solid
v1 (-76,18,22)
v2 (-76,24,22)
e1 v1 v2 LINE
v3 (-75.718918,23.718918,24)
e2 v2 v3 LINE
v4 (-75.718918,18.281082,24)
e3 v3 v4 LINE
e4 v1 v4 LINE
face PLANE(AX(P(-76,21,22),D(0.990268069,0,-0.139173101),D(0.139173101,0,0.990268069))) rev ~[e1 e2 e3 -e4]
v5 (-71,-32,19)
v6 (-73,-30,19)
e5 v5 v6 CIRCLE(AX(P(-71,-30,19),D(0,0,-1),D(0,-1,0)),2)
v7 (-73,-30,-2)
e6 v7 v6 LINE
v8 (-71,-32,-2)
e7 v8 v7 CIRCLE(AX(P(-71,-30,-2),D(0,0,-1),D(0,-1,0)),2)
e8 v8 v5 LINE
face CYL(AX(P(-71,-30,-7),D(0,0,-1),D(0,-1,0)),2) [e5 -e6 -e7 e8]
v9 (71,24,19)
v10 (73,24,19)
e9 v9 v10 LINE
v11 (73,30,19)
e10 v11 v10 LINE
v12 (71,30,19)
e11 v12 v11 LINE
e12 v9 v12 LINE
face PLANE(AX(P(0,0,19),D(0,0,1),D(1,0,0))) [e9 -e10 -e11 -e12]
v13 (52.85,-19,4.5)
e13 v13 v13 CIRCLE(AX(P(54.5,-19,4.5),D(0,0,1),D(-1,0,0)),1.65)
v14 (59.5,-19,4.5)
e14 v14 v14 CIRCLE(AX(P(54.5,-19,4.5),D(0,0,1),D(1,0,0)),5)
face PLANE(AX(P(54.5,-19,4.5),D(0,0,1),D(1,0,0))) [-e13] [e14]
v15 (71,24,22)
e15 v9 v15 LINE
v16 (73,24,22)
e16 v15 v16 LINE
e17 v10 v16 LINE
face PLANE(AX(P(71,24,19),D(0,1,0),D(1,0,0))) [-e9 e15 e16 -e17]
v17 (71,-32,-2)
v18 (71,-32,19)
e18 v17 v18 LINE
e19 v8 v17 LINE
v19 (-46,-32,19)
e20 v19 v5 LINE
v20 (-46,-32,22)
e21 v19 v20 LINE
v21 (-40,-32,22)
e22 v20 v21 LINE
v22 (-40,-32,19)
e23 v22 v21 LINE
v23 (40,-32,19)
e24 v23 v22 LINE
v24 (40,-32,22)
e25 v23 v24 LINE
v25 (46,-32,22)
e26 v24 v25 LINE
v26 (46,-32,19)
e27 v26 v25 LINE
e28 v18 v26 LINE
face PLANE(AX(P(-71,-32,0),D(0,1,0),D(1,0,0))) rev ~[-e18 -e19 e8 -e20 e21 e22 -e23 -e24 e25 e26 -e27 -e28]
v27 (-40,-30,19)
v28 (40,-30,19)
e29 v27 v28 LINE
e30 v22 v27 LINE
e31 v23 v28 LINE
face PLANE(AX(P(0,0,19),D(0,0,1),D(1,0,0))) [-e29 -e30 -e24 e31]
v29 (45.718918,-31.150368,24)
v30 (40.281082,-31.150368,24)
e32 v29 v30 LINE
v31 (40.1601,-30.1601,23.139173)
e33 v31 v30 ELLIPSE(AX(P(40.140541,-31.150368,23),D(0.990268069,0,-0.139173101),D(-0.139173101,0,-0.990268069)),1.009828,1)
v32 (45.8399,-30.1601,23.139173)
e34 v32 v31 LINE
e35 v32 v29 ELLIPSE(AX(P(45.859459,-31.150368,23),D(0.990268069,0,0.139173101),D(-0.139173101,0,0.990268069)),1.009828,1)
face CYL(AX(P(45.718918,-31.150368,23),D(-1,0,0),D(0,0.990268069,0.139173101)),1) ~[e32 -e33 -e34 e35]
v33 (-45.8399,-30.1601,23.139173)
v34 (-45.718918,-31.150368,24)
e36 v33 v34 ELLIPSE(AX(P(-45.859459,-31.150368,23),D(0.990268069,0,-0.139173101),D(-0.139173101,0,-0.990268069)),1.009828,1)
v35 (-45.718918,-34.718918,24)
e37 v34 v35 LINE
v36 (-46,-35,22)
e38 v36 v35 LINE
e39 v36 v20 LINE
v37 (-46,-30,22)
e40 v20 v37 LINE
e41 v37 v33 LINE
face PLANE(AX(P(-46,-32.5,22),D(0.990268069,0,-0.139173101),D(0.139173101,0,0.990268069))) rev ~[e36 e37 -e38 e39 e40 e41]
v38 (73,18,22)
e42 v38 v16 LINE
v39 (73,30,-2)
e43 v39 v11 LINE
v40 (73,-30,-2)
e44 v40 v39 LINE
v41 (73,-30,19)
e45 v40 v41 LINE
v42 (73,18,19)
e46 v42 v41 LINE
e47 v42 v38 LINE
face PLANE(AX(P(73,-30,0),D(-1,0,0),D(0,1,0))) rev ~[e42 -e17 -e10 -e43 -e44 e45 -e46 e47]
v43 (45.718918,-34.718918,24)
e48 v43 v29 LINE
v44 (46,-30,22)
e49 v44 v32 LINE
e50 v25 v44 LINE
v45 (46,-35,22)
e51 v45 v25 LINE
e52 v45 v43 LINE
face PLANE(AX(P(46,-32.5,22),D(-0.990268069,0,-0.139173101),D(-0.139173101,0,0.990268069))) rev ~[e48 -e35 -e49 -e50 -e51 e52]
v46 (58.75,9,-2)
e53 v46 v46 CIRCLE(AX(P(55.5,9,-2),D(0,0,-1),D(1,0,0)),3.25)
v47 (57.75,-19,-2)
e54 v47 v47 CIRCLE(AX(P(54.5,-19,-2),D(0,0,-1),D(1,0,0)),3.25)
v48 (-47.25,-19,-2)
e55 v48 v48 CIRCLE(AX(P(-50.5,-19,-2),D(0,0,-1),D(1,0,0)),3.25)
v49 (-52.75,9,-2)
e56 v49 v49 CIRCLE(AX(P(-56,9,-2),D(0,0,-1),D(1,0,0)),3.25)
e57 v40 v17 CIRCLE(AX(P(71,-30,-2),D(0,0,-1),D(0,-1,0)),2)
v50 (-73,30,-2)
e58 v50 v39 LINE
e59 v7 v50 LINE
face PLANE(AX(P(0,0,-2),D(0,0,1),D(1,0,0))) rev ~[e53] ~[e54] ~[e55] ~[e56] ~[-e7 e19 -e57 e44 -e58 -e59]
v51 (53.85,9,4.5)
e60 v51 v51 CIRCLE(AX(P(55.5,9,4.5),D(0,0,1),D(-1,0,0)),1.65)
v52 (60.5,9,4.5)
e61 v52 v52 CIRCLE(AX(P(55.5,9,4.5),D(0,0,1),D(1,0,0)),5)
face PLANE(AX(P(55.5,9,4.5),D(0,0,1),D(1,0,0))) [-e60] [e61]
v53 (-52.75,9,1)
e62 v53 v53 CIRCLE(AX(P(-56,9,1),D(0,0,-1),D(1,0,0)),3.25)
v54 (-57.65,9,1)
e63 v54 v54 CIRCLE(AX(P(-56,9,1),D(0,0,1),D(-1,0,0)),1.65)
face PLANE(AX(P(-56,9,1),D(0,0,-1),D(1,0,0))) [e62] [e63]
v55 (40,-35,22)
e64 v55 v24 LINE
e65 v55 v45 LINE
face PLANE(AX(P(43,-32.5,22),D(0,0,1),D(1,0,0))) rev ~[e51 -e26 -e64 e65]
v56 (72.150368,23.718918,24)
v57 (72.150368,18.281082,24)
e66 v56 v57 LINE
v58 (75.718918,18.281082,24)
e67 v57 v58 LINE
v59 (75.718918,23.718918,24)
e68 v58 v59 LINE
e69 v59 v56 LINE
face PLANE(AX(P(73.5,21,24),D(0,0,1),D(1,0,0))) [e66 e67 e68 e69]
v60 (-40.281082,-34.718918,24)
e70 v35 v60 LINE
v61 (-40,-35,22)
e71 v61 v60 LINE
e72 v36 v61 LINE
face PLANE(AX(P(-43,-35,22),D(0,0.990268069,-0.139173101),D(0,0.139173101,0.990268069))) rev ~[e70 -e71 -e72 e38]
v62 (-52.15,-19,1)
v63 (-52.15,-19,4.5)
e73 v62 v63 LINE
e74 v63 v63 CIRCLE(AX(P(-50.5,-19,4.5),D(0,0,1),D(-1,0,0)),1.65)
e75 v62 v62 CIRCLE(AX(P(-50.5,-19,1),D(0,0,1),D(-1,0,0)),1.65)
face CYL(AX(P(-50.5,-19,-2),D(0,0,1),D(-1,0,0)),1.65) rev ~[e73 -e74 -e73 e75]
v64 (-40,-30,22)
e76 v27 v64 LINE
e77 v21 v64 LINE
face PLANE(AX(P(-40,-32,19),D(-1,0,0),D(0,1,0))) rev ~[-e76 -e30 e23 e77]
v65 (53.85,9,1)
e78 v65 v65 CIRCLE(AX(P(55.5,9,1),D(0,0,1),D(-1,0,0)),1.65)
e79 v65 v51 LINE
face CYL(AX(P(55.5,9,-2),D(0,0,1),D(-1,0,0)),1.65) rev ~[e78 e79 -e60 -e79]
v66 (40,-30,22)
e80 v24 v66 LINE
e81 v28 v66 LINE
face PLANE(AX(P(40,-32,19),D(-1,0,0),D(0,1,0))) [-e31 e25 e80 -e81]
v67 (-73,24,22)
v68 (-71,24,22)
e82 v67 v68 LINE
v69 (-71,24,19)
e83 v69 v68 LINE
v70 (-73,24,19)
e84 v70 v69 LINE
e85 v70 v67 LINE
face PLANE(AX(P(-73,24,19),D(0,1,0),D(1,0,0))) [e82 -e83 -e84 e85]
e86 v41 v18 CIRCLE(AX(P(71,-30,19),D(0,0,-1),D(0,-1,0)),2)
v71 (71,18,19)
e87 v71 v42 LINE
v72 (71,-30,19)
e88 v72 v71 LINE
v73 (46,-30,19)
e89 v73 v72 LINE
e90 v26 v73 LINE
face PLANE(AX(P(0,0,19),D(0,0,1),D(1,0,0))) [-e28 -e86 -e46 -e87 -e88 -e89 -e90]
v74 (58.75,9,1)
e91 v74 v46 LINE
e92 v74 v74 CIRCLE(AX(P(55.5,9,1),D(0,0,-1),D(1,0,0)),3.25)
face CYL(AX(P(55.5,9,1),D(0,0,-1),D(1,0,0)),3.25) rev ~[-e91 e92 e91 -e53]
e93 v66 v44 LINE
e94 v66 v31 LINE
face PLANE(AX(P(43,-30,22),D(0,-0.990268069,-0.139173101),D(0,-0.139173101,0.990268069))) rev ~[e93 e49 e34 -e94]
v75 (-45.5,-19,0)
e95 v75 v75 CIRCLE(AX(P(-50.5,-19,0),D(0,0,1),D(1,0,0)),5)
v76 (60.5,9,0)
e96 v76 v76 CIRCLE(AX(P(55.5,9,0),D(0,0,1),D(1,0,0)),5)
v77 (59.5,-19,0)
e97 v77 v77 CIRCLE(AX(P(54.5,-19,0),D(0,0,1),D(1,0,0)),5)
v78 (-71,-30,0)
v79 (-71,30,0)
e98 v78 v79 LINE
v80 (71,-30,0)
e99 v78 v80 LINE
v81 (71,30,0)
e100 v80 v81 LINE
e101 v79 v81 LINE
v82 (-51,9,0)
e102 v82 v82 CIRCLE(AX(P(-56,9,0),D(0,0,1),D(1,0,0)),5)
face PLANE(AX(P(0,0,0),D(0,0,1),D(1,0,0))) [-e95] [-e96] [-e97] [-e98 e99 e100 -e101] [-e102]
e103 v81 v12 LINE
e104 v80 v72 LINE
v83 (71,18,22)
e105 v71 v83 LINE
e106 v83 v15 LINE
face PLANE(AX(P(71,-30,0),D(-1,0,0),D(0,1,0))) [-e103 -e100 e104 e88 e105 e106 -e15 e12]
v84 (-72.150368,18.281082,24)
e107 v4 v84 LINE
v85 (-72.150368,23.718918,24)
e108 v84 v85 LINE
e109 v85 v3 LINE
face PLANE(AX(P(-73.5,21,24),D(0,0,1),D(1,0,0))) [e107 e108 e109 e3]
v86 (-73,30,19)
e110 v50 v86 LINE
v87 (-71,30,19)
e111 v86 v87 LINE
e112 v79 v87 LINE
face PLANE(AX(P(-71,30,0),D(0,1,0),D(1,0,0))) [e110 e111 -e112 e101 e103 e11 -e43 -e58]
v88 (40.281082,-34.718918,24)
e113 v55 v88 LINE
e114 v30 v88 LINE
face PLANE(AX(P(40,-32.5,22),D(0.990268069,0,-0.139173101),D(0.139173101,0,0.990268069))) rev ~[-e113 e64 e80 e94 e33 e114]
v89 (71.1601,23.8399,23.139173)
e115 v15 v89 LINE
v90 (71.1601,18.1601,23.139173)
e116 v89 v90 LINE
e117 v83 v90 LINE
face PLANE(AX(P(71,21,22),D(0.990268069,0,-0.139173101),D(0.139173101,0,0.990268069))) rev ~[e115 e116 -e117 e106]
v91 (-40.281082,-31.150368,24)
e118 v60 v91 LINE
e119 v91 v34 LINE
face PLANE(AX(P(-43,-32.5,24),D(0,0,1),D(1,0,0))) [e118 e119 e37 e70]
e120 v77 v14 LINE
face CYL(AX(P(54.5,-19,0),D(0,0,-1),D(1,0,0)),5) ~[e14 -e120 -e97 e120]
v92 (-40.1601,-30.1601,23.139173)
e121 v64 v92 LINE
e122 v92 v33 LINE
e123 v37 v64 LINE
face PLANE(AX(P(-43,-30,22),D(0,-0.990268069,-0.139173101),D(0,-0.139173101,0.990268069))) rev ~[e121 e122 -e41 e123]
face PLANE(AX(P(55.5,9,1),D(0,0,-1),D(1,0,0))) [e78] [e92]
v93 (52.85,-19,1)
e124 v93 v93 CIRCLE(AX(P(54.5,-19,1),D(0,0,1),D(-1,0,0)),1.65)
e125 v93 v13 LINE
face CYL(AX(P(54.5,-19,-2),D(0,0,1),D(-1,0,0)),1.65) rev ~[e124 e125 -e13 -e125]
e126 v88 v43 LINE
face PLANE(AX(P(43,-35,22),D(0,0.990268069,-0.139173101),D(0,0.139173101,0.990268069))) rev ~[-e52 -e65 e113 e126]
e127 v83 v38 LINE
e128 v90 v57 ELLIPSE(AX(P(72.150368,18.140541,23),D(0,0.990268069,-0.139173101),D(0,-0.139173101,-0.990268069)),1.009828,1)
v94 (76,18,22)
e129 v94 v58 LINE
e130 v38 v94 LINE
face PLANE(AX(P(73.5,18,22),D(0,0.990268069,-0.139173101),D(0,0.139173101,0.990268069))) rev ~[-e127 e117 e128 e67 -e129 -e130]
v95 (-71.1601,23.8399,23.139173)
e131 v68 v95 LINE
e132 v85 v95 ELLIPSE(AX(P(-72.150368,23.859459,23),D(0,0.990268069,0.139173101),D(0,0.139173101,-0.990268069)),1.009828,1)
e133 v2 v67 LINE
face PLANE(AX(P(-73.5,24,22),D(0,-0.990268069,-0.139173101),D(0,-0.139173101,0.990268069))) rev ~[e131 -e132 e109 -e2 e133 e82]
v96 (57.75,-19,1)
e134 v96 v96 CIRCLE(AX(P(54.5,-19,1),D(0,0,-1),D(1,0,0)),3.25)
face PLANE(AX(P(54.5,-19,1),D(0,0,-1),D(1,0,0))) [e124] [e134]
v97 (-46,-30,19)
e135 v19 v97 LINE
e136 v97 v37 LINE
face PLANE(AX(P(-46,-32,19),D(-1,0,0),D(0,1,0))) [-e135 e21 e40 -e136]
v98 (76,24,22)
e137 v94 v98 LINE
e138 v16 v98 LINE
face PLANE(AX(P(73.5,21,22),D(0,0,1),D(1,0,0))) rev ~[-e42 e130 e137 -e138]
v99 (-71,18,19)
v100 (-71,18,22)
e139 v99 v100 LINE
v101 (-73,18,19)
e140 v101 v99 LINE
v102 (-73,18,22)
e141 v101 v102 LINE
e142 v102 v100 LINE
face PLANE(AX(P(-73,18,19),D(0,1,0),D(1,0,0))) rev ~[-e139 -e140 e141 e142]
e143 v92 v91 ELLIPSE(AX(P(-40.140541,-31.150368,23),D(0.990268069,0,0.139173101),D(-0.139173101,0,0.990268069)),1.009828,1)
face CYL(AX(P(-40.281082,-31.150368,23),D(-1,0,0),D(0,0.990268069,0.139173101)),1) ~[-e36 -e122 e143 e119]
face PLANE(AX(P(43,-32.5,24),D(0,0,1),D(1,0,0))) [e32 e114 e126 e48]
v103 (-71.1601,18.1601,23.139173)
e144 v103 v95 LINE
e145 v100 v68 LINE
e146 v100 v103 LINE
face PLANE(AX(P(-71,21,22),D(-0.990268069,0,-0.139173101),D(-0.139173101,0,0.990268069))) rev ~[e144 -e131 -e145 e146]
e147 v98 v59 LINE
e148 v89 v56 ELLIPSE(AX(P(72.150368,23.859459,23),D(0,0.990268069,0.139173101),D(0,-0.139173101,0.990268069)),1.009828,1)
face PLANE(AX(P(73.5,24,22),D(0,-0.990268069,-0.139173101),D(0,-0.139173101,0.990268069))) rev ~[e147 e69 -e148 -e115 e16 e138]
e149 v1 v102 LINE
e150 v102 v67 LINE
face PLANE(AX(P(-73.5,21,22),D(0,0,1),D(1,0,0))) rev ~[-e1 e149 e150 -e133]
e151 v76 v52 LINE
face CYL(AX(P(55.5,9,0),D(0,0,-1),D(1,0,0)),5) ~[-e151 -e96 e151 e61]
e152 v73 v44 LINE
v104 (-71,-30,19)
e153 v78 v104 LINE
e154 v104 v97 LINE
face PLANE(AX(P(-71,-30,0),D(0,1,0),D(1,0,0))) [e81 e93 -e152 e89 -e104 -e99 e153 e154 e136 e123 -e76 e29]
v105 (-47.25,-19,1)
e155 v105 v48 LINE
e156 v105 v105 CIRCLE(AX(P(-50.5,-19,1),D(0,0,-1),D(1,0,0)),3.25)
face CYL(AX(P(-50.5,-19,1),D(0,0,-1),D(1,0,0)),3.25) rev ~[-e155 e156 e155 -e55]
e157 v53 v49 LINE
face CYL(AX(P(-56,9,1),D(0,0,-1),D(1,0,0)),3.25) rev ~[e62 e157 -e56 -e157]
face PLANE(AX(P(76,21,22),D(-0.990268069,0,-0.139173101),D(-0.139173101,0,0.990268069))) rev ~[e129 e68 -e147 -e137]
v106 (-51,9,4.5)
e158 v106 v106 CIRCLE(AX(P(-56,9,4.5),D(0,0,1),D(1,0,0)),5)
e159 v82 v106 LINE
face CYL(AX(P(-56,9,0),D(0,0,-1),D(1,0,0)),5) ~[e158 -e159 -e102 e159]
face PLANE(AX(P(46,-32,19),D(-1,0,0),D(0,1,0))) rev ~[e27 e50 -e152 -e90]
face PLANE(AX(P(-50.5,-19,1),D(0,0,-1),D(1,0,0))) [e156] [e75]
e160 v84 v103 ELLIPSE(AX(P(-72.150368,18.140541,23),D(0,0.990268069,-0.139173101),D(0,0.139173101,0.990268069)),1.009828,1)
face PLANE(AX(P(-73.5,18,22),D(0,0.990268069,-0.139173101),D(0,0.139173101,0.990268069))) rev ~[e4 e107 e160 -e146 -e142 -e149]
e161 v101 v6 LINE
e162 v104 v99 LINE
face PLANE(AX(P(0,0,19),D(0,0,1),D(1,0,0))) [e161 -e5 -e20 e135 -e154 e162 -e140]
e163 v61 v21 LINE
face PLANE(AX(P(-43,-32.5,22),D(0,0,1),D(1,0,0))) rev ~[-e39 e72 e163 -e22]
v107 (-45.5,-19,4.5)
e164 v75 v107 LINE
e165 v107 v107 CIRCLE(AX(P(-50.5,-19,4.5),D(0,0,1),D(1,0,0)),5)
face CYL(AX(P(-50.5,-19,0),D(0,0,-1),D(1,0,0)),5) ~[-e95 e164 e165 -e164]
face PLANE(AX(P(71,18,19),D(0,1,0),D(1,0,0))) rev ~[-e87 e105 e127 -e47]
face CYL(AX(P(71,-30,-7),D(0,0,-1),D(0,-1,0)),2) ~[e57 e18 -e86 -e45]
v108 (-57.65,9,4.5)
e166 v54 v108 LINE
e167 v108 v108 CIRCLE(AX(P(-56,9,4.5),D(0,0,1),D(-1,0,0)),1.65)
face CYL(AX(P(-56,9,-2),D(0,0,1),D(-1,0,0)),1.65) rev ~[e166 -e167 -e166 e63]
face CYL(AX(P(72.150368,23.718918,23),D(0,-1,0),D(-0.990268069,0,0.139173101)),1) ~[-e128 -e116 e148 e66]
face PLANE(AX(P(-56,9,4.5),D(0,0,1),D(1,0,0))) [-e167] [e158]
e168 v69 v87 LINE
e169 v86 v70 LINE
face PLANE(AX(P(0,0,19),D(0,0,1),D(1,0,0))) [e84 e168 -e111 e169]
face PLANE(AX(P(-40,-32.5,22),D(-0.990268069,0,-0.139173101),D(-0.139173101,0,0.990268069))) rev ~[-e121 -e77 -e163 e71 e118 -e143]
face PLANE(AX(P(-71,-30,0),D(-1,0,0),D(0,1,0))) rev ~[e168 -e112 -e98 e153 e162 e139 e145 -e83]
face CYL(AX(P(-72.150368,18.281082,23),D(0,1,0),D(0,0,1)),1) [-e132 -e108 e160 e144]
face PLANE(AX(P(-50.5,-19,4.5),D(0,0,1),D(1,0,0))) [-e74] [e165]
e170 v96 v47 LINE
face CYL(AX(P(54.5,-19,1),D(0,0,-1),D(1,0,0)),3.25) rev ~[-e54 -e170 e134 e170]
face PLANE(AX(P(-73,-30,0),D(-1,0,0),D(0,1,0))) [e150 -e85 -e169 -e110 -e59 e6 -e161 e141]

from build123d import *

# Parameters (mm, degrees)
F0_W            = 142
F0_H            = 60
F0_R            = 5
F1_DEPTH        = 19
F2_T            = 2
F3_T1_DEPTH     = 31
F4_W            = 6
F4_H            = 2
F4_W_2          = 2
F4_H_2          = 6
F5_DEPTH        = 3
F6_W            = 5
F6_H            = 6
F6_W_2          = 6
F6_H_2          = 5
F7_DEPTH        = 2
F7_TAPER        = 8
F8_R            = 1
F9_DEPTH        = 4.5
F11_D           = 3.3
F11_CBORE_D     = 6.5
F11_CBORE_DEPTH = 3


# Not quite as in the source:
# - a fillet or chamfer that OpenCascade refuses, or shapes differently, is made with other operations: its cross-section is extruded or revolved along the edge and cut away or added
# - a feature names something its author has since deleted; it is built from what else it names


with BuildPart() as f1:
    # F0 (on Top) → F1 (new body)
    with BuildSketch(Plane.XY):
        Rectangle(F0_W, F0_H)
        with Locations((-50.5, -19)):
            Circle(F0_R, mode=Mode.SUBTRACT)
        with Locations((54.5, -19)):
            Circle(F0_R, mode=Mode.SUBTRACT)
        with Locations((-56, 9)):
            Circle(F0_R, mode=Mode.SUBTRACT)
        with Locations((55.5, 9)):
            Circle(F0_R, mode=Mode.SUBTRACT)
        with Locations((-56, 9)):
            Circle(F0_R)
        with Locations((-50.5, -19)):
            Circle(F0_R)
        with Locations((54.5, -19)):
            Circle(F0_R)
        with Locations((55.5, 9)):
            Circle(F0_R)
    extrude(amount=F1_DEPTH)

    # F2
    f2_openings = [f1.faces().sort_by_distance(p)[0] for p in [
        (0, 0, 19),
        (0, 30, 9.5),
    ]]
    offset(amount=F2_T, openings=f2_openings, kind=Kind.INTERSECTION)

    # F3: fillet of radius 2 on 2 edges, made by hand

    # F3_s2 → F3_t1 (cut)
    with BuildSketch(Plane.XY.offset(-7)):
        with BuildLine():
            ThreePointArc((-71, -32), (-72.4142135624, -31.4142135624), (-73, -30))
            Line((-73, -30), (-73, -32))
            Line((-73, -32), (-71, -32))
        make_face()
        with BuildLine():
            ThreePointArc((71, -32), (72.4142135624, -31.4142135624), (73, -30))
            Line((73, -30), (73, -32))
            Line((73, -32), (71, -32))
        make_face()
    extrude(amount=F3_T1_DEPTH, mode=Mode.SUBTRACT)

    # F4 (on face) → F5 (join)
    with BuildSketch(Plane.XY.offset(19)):
        with Locations((-43, -31)):
            Rectangle(F4_W, F4_H)
        with Locations((-72, 21)):
            Rectangle(F4_W_2, F4_H_2)
        with Locations((72, 21)):
            Rectangle(F4_W_2, F4_H_2)
        with Locations((43, -31)):
            Rectangle(F4_W, F4_H)
    extrude(amount=F5_DEPTH)

    # F6 (on face) → F7 (join)
    with BuildSketch(Plane.XY.offset(22)):
        with Locations((-73.5, 21)):
            Rectangle(F6_W, F6_H)
        with Locations((-43, -32.5)):
            Rectangle(F6_W_2, F6_H_2)
        with Locations((43, -32.5)):
            Rectangle(F6_W_2, F6_H_2)
        with Locations((73.5, 21)):
            Rectangle(F6_W, F6_H)
    extrude(amount=F7_DEPTH, taper=F7_TAPER)

    # F8
    f8_edges = [f1.edges().sort_by_distance(p)[0] for p in [
        (-71.281082, 21, 24),
        (-43, -30.281082, 24),
        (43, -30.281082, 24),
        (71.281082, 21, 24),
    ]]
    fillet(f8_edges, radius=F8_R)

    # F0 (on Top) → F9 (join)
    with BuildSketch(Plane.XY):
        with Locations((-56, 9)):
            Circle(F0_R)
        with Locations((55.5, 9)):
            Circle(F0_R)
        with Locations((54.5, -19)):
            Circle(F0_R)
        with Locations((-50.5, -19)):
            Circle(F0_R)
    extrude(amount=F9_DEPTH)

    # F11 (through all)
    with Locations(Plane(origin=(0, 0, -2), x_dir=(1, 0, 0), z_dir=(0, 0, -1))):
        with Locations((-50.5, 19), (-56, -9), (55.5, -9), (54.5, 19)):
            CounterBoreHole(F11_D / 2, F11_CBORE_D / 2, F11_CBORE_DEPTH)


solid = f1.part
